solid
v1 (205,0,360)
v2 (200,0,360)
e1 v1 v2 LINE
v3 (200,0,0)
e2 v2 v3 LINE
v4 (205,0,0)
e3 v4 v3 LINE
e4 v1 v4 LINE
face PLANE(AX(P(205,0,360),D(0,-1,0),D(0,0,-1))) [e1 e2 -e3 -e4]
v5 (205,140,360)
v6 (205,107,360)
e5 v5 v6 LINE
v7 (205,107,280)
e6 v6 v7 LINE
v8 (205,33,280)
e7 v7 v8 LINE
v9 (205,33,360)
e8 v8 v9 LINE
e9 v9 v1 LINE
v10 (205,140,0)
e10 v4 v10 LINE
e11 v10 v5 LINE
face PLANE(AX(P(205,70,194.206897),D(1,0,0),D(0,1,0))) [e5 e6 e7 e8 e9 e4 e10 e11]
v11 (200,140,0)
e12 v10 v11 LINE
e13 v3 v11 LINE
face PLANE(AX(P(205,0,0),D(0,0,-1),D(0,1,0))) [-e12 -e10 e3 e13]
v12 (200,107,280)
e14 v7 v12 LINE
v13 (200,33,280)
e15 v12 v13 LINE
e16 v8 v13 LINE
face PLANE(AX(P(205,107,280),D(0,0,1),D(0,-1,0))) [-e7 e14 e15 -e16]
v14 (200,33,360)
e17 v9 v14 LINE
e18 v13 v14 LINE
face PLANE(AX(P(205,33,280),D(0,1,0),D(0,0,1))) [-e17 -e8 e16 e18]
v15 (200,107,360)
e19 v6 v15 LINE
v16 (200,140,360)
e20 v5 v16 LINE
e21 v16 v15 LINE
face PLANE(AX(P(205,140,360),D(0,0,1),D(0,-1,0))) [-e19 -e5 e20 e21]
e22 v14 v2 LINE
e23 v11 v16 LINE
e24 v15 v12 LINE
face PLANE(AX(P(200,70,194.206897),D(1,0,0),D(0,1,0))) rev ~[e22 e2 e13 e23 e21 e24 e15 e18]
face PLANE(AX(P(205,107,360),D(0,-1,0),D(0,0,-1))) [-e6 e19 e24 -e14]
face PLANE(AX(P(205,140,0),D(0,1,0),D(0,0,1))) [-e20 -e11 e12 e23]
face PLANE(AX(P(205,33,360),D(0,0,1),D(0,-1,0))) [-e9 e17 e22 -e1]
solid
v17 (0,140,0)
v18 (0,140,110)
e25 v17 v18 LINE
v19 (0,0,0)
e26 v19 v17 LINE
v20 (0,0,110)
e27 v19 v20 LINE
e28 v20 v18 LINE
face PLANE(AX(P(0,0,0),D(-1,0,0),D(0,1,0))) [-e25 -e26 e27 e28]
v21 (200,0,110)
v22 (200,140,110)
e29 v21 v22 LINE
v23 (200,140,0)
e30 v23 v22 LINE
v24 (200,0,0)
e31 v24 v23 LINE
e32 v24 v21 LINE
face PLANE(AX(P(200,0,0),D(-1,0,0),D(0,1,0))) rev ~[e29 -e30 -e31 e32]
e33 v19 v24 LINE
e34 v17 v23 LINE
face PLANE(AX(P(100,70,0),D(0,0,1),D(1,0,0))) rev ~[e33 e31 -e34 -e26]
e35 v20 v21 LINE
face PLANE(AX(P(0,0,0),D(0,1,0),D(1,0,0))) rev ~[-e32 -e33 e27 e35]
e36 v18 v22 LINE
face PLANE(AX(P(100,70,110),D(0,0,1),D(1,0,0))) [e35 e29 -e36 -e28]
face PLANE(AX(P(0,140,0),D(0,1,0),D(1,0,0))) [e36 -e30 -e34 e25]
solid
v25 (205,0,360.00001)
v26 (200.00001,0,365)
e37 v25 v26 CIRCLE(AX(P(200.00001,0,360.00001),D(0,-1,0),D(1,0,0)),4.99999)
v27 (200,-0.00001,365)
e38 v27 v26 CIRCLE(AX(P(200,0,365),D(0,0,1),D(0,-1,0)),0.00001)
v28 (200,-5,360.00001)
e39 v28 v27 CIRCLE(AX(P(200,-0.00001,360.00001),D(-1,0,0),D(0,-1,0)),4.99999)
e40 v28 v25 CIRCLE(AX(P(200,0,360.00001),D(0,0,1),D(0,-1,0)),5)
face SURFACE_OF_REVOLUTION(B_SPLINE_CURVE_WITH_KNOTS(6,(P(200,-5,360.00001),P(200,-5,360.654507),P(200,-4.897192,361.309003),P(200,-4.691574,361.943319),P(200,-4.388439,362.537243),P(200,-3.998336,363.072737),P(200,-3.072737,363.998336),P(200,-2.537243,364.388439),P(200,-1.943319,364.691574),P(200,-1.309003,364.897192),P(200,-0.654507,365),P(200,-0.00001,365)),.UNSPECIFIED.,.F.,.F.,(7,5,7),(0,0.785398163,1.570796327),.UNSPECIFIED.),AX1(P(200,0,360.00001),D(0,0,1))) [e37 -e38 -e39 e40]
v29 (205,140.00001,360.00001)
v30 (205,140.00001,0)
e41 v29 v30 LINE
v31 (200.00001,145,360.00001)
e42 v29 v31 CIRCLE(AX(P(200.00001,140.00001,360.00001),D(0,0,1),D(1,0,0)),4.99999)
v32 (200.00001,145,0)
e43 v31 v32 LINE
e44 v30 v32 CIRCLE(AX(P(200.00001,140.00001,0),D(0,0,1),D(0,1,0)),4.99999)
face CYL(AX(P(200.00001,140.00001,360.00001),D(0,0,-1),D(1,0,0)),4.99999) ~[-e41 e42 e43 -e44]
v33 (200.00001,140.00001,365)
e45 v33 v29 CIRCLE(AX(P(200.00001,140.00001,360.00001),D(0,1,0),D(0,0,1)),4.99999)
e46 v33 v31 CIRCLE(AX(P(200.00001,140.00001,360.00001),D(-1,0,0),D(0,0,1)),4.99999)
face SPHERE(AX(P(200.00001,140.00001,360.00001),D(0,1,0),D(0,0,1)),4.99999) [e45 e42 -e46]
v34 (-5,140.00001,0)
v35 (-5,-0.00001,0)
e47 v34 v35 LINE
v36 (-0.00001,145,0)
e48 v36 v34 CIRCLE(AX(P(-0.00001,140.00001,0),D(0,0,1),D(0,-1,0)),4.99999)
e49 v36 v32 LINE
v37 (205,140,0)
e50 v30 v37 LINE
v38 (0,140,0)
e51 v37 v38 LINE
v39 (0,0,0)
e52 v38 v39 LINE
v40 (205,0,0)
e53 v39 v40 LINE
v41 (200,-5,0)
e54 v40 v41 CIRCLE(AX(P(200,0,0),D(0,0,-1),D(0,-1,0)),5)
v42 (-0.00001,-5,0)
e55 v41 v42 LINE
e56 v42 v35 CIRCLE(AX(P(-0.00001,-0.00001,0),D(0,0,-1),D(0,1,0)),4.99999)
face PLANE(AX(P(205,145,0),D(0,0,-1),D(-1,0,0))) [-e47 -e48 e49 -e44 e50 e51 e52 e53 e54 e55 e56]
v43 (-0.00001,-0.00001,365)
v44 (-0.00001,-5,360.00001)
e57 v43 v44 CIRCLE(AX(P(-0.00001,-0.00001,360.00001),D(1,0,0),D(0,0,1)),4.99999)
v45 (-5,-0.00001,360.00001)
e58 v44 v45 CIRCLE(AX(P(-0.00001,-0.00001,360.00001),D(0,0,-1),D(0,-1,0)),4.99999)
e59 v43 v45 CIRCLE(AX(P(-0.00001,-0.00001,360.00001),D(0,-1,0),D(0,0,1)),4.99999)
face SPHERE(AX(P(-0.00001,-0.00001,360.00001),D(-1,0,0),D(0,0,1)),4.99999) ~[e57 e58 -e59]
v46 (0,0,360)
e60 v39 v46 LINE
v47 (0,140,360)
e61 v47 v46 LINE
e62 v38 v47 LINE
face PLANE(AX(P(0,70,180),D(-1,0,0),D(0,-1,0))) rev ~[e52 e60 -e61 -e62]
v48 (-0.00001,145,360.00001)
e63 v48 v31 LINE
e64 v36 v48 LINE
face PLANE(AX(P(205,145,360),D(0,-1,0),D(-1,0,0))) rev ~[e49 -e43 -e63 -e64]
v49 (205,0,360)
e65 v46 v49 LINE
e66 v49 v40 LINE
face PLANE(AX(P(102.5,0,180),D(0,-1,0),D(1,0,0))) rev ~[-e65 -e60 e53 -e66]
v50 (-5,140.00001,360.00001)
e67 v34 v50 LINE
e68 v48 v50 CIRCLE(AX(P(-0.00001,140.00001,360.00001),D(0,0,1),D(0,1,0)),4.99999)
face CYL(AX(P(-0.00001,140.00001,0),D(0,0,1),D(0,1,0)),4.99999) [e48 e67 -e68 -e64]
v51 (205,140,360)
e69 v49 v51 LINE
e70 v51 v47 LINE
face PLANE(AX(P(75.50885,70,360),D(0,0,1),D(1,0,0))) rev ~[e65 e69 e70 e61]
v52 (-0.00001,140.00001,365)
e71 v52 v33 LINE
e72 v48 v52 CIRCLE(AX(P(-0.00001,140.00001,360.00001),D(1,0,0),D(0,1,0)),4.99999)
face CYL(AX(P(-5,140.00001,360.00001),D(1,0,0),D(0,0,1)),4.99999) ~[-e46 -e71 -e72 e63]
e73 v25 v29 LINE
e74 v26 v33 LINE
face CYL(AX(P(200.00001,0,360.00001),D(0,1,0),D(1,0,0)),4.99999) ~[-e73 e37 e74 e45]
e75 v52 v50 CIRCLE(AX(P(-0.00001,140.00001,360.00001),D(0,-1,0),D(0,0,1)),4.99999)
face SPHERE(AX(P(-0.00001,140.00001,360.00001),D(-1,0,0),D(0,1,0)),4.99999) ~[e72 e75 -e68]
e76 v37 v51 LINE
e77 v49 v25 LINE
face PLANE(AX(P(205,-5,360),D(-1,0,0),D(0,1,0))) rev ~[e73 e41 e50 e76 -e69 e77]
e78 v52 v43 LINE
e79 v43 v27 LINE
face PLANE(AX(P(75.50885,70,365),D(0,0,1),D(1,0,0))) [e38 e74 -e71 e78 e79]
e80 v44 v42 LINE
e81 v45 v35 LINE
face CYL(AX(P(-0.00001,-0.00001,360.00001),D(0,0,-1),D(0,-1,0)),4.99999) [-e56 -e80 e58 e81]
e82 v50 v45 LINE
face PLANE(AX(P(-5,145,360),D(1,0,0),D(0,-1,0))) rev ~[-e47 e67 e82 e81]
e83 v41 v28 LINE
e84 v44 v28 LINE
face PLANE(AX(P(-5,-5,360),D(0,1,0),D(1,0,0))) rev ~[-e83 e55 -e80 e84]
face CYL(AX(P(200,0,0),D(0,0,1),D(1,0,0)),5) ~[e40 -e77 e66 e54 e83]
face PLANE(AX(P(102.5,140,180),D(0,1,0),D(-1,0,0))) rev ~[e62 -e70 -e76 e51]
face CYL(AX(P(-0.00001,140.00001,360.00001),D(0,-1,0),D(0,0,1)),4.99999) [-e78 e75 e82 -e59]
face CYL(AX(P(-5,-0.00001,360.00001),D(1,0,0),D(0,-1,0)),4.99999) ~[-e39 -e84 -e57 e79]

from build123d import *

# Parameters (mm, degrees)
F0_W      = 205
F0_H      = 360
F1_DEPTH  = 5
F2_W      = 150
F2_H      = 360
F3_DEPTH  = 5
F4_W      = 205
F4_H      = 360
F5_DEPTH  = 5
F6_W      = 205
F6_H      = 140
F7_DEPTH  = 5
F9_DEPTH  = 5
F10_R     = 5
F11_R     = 4.99999
F12_R     = 4.99999
F13_R     = 4.99999
F14_W     = 200
F14_H     = 140
F15_DEPTH = 110


# Not quite as in the source:
# - a fillet or chamfer is up to 0.001 mm smaller than in the source, because OpenCascade refuses the exact size


with BuildPart() as f1:
    # F0 (on Front) → F1 (new body)
    with BuildSketch(Plane.XZ):
        with Locations((102.5, 180)):
            Rectangle(F0_W, F0_H)
    extrude(amount=F1_DEPTH)

    # F2 (on face) → F3 (join)
    with BuildSketch(Plane(origin=(0, 0, 0), x_dir=(0, -1, 0), z_dir=(-1, 0, 0))):
        with Locations((-70, 180)):
            Rectangle(F2_W, F2_H)
    extrude(amount=F3_DEPTH)

    # F4 (on face) → F5 (join)
    with BuildSketch(Plane(origin=(0, 145, 0), x_dir=(-1, 0, 0), z_dir=(0, 1, 0))):
        with Locations((-102.5, 180)):
            Rectangle(F4_W, F4_H)
    extrude(amount=-F5_DEPTH)

    # F6 (on face) → F7 (join)
    with BuildSketch(Plane.XY.offset(360)):
        Polygon((-5, 145), (-5, -5), (205, -5), (205, 0), (0, 0), (0, 140), (205, 140), (205, 145), align=None)
        with Locations((102.5, 70)):
            Rectangle(F6_W, F6_H)
    extrude(amount=F7_DEPTH)

    # F10
    f10_edges = [f1.edges().sort_by_distance(p)[0] for p in [
        (205, -5, 182.5),
    ]]
    fillet(f10_edges, radius=F10_R)

    # F11 (radius 5 in the source; OpenCascade refuses exactly that, so slightly less here)
    f11_edges = [f1.edges().sort_by_distance(p)[0] for p in [
        (205, 72.5, 365),
    ]]
    fillet(f11_edges, radius=F11_R)

    # F12 (radius 5 in the source; OpenCascade refuses exactly that, so slightly less here)
    f12_edges = [f1.edges().sort_by_distance(p)[0] for p in [
        (205, 145, 180.000005),
    ]]
    fillet(f12_edges, radius=F12_R)

    # F13 (radius 5 in the source; OpenCascade refuses exactly that, so slightly less here)
    f13_edges = [f1.edges().sort_by_distance(p)[0] for p in [
        (-5, 70, 365),
    ]]
    fillet(f13_edges, radius=F13_R)


with BuildPart() as f9:
    # F8 (on face) → F9 (new body)
    with BuildSketch(Plane.YZ.offset(205)):
        Polygon((33, 280), (33, 360), (0, 360), (0, 0), (140, 0), (140, 360), (107, 360), (107, 280), align=None)
    extrude(amount=-F9_DEPTH)


with BuildPart() as f15:
    # F14 (on Top) → F15 (new body)
    with BuildSketch(Plane.XY):
        with Locations((100, 70)):
            Rectangle(F14_W, F14_H)
    extrude(amount=F15_DEPTH)


solid = Compound([f1.part, f9.part, f15.part])
